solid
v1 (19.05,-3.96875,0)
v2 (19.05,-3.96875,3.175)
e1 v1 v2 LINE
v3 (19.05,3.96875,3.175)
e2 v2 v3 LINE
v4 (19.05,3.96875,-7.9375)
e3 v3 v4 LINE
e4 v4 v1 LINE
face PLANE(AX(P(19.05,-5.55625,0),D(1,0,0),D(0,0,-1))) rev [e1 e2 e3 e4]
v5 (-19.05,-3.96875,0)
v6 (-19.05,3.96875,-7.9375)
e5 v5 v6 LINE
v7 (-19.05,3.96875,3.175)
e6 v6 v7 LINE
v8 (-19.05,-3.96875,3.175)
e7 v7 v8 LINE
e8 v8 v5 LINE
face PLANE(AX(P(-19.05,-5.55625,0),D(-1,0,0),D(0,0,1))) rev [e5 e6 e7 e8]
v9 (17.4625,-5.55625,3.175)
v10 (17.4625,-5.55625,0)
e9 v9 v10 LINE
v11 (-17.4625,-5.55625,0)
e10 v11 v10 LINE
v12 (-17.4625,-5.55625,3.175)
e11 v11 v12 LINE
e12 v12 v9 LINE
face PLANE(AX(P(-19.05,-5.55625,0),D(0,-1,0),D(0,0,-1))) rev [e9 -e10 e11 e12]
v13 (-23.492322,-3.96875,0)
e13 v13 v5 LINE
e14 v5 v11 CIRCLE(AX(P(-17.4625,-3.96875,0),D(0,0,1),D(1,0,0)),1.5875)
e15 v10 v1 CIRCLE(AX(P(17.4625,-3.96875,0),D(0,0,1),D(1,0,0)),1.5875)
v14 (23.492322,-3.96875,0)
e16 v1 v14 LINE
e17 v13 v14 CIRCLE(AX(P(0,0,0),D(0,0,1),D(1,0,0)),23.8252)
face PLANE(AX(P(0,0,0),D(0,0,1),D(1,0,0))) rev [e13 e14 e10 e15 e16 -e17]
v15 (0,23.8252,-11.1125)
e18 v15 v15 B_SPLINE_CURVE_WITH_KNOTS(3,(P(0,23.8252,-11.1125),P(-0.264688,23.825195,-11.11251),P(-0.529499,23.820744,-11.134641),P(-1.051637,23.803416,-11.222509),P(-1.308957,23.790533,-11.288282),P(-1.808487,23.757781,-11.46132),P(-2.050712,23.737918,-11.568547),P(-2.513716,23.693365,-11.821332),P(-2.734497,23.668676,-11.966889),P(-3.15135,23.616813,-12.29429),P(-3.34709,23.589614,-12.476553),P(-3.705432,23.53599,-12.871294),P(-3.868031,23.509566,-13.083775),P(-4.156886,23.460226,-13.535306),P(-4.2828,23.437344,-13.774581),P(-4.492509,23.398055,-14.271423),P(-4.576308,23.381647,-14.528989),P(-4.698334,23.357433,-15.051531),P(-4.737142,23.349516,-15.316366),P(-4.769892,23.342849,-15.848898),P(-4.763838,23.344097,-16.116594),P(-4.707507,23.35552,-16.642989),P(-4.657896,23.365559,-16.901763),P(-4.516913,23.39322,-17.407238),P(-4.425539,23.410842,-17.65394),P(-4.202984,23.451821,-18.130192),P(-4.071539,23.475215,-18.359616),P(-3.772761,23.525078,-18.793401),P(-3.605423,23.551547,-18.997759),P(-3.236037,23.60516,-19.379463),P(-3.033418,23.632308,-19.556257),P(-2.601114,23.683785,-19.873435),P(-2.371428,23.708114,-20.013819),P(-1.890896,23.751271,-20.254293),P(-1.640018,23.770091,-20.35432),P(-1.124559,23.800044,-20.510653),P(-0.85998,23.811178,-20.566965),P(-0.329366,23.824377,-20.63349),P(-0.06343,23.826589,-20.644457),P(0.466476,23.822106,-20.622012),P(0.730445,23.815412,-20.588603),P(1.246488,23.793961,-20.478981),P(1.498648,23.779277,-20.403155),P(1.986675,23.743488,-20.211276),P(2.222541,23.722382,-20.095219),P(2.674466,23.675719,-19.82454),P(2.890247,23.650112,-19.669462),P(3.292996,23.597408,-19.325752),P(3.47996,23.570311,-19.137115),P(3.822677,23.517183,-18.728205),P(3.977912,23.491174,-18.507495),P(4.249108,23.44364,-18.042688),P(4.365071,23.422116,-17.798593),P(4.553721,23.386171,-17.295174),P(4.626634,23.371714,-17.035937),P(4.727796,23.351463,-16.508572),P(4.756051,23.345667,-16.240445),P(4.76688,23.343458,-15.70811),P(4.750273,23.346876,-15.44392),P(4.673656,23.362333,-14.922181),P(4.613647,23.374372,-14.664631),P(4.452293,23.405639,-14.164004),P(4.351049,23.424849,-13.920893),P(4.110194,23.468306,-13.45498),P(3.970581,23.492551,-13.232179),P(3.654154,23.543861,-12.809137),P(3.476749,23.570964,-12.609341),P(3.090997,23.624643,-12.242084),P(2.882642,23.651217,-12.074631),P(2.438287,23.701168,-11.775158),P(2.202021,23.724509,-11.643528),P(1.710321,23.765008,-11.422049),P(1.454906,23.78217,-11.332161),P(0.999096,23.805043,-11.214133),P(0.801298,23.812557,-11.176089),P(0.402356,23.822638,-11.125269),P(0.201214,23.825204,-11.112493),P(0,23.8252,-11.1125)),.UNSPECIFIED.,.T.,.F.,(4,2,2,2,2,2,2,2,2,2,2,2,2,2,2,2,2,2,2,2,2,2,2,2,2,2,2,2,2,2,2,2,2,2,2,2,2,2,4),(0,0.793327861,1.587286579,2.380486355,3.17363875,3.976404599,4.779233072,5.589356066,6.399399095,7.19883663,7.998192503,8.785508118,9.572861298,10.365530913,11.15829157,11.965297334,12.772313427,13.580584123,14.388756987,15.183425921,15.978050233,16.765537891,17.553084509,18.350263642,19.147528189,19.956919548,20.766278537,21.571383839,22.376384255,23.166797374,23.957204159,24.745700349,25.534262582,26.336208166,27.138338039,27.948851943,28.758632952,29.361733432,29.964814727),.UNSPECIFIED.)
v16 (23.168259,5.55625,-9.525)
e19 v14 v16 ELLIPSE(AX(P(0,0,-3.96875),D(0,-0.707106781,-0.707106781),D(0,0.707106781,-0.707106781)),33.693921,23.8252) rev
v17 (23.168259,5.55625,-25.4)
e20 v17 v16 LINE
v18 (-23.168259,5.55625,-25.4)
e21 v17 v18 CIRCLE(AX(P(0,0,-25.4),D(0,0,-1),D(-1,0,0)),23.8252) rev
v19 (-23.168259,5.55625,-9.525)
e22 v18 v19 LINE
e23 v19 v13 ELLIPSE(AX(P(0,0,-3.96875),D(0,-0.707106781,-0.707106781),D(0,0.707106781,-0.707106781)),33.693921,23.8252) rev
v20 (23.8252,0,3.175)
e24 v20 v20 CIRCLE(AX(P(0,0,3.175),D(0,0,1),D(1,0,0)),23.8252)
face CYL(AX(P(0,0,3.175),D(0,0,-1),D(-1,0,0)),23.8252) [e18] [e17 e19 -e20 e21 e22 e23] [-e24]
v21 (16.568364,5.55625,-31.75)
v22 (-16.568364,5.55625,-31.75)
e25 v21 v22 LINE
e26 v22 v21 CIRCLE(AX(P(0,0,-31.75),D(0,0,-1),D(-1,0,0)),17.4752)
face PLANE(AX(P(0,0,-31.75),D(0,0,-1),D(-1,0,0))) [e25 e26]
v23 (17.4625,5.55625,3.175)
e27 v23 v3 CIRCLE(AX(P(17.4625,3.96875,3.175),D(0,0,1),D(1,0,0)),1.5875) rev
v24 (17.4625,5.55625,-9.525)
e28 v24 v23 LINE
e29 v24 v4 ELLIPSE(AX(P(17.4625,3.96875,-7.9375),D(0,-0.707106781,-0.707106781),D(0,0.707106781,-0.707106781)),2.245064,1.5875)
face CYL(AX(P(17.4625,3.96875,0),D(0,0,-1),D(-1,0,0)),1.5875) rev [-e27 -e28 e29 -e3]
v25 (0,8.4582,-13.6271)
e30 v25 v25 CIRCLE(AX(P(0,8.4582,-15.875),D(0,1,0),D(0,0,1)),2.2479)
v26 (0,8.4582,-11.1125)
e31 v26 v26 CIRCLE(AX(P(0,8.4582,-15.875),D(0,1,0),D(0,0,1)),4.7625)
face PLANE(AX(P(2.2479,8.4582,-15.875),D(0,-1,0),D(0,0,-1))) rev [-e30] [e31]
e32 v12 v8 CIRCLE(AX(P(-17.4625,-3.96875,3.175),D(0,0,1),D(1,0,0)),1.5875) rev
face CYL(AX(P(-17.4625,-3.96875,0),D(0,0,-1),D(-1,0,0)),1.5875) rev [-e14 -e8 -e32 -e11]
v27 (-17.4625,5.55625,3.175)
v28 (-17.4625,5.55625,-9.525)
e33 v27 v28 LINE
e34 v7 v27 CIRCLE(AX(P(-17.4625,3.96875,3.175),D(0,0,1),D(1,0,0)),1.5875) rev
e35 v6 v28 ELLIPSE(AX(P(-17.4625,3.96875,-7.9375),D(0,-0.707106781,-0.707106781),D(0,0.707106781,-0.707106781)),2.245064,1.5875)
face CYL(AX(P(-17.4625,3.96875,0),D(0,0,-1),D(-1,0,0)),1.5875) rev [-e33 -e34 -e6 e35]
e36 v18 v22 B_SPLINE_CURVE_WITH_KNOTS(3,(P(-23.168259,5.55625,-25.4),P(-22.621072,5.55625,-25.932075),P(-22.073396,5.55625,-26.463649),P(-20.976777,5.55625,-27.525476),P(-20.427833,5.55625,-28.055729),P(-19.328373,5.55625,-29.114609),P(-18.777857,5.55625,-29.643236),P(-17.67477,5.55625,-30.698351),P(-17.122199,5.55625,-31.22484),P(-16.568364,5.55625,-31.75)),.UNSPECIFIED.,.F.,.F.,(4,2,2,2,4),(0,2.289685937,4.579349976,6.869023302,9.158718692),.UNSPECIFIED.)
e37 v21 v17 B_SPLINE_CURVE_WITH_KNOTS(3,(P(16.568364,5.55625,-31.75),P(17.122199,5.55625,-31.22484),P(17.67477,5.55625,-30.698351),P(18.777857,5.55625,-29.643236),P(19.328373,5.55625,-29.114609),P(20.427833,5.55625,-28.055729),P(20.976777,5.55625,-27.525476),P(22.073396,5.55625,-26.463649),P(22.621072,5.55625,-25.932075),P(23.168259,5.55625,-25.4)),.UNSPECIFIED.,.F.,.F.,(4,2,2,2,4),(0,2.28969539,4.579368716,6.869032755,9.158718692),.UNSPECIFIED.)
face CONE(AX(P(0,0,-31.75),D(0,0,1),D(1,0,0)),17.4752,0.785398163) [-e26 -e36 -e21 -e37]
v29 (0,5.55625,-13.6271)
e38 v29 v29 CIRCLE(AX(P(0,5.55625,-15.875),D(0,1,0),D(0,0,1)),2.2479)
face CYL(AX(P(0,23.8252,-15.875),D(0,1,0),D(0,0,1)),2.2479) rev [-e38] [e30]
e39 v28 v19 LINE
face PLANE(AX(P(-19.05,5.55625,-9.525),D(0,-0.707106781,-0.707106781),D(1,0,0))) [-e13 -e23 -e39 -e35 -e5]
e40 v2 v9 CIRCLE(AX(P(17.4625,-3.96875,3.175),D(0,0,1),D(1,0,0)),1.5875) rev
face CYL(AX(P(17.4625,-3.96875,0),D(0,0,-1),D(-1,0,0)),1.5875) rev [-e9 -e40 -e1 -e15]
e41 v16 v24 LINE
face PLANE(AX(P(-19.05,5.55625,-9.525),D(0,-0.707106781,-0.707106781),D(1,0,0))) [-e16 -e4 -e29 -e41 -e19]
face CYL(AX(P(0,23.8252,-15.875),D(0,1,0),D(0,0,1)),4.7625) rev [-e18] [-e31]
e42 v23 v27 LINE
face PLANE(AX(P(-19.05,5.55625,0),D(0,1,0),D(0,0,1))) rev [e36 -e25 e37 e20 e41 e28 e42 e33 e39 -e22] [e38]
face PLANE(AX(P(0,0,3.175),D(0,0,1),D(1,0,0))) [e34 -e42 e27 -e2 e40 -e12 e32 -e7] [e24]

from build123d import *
from build123d.topology import SkipClean

# Parameters (mm, degrees)
SKETCH1_R                                           = 23.8252
BOSS_EXTRUDE1_DEPTH                                 = 3.175
SKETCH8_W                                           = 38.1
SKETCH8_H                                           = 11.1125
CUT_EXTRUDE1_DEPTH                                  = 34.843181515
FILLET1_R                                           = 1.5875
BOSS_EXTRUDE2_START                                 = 31.75
BOSS_EXTRUDE2_DEPTH                                 = 31.75
CHAMFER1_START                                      = -23.8252001
CHAMFER1_DEPTH                                      = 6.3627001
CHAMFER1_START_2                                    = 17.4625
CHAMFER1_2_DEPTH                                    = 6.3627
CHAMFER1_START_3                                    = -31.7500001
CHAMFER1_3_DEPTH                                    = 31.7500001
CBORE_FOR_8_BINDING_HEAD_MACHINE_SCREW1_D           = 4.4958
CBORE_FOR_8_BINDING_HEAD_MACHINE_SCREW1_CBORE_D     = 9.525
CBORE_FOR_8_BINDING_HEAD_MACHINE_SCREW1_CBORE_DEPTH = 15.367
CHAMFER3_SIZE                                       = 6.35


with BuildPart() as part:
    # Sketch1 → Boss-Extrude1 (new body)
    with BuildSketch(Plane.XY):
        Circle(SKETCH1_R)
    extrude(amount=BOSS_EXTRUDE1_DEPTH)

    # Sketch8 → Cut-Extrude1 (cut, through all)
    with BuildSketch(Plane.XY.offset(3.175)):
        Rectangle(SKETCH8_W, SKETCH8_H)
    extrude(amount=-CUT_EXTRUDE1_DEPTH, mode=Mode.SUBTRACT)

    # Fillet1
    fillet1_edges = [part.edges().sort_by_distance(p)[0] for p in [
        (19.05, -5.55625, 1.5875),
        (-19.05, -5.55625, 1.5875),
        (-19.05, 5.55625, 1.5875),
        (19.05, 5.55625, 1.5875),
    ]]
    fillet(fillet1_edges, radius=FILLET1_R)

    # Sketch9 → Boss-Extrude2 (add)
    with SkipClean():  # the faces are left unmerged after this step: merging them gives an invalid solid
        with BuildSketch(Plane(origin=(0, 0, 0), x_dir=(-1, 0, 0), z_dir=(0, 0, -1)).offset(BOSS_EXTRUDE2_START)):
            with BuildLine():
                Line((-23.168259343, 5.55625), (23.168259343, 5.55625))
                ThreePointArc((23.168259343, 5.55625), (0, 23.8252), (-23.168259343, 5.55625))
            make_face()
        extrude(amount=-BOSS_EXTRUDE2_DEPTH)

    # Chamfer1: read off the stored shape, not the designer's step
    # Chamfer1 outline → Chamfer1 (add)
    with SkipClean():  # the faces are left unmerged after this step: merging them gives an invalid solid
        with BuildSketch(Plane.YZ.offset(CHAMFER1_START)):
            Polygon((5.55625, 0), (-3.96875, 0), (5.55625, -9.525), align=None)
        extrude(amount=CHAMFER1_DEPTH)

    # Chamfer1 2 outline → Chamfer1 2 (add)
    with SkipClean():  # the faces are left unmerged after this step: merging them gives an invalid solid
        with BuildSketch(Plane.YZ.offset(CHAMFER1_START_2)):
            Polygon((5.55625, 0), (-3.96875, 0), (5.55625, -9.525), align=None)
        extrude(amount=CHAMFER1_2_DEPTH)

    # Chamfer1 3 outline → Chamfer1 3 (cut)
    with BuildSketch(Plane.XY.offset(CHAMFER1_START_3)):
        with BuildLine():
            Line((23.8252, -5), (23.8252, 0))
            ThreePointArc((23.8252, 0), (23.692188185, -2.514035408), (23.294637903, -5))
            Line((23.294637903, -5), (23.8252, -5))
        make_face()
        with BuildLine():
            ThreePointArc((23.168259343, 5.55625), (23.660394835, 2.797475875), (23.8252, 0))
            Line((23.8252, 0), (23.8252, 5.55625))
            Line((23.8252, 5.55625), (23.168259343, 5.55625))
        make_face()
        with BuildLine():
            ThreePointArc((19.05, 3.96875), (18.585032015, 5.091282015), (17.4625, 5.55625))
            Line((17.4625, 5.55625), (17.4625, -5))
            Line((17.4625, -5), (19.05, -5))
            Line((19.05, -5), (19.05, 3.96875))
        make_face()
        with BuildLine():
            Line((-23.8252001, -5), (-23.294637903, -5))
            ThreePointArc((-23.294637903, -5), (-23.692188185, -2.514035408), (-23.8252, 0))
            Line((-23.8252, 0), (-23.8252001, -5))
        make_face()
        with BuildLine():
            Line((-17.4625, -5), (-17.4625, 5.55625))
            ThreePointArc((-17.4625, 5.55625), (-18.585032015, 5.091282015), (-19.05, 3.96875))
            Line((-19.05, 3.96875), (-19.05, -5))
            Line((-19.05, -5), (-17.4625, -5))
        make_face()
        with BuildLine():
            Line((-23.8252001, 5.55625), (-23.8252, 0))
            ThreePointArc((-23.8252, 0), (-23.660394835, 2.797475875), (-23.168259343, 5.55625))
            Line((-23.168259343, 5.55625), (-23.8252001, 5.55625))
        make_face()
    extrude(amount=CHAMFER1_3_DEPTH, mode=Mode.SUBTRACT)

    # CBORE for #8 Binding Head Machine Screw1 (through all)
    with Locations(Plane(origin=(0, 23.8252, 0), x_dir=(1, 0, 0), z_dir=(0, 1, 0))):
        with Locations((0, 15.875)):
            CounterBoreHole(CBORE_FOR_8_BINDING_HEAD_MACHINE_SCREW1_D / 2, CBORE_FOR_8_BINDING_HEAD_MACHINE_SCREW1_CBORE_D / 2, CBORE_FOR_8_BINDING_HEAD_MACHINE_SCREW1_CBORE_DEPTH)

    # Chamfer3
    chamfer3_edges = [part.edges().sort_by_distance(p)[0] for p in [
        (0, 23.8252, -31.75),
    ]]
    chamfer(chamfer3_edges, length=CHAMFER3_SIZE)


solid = part.part
